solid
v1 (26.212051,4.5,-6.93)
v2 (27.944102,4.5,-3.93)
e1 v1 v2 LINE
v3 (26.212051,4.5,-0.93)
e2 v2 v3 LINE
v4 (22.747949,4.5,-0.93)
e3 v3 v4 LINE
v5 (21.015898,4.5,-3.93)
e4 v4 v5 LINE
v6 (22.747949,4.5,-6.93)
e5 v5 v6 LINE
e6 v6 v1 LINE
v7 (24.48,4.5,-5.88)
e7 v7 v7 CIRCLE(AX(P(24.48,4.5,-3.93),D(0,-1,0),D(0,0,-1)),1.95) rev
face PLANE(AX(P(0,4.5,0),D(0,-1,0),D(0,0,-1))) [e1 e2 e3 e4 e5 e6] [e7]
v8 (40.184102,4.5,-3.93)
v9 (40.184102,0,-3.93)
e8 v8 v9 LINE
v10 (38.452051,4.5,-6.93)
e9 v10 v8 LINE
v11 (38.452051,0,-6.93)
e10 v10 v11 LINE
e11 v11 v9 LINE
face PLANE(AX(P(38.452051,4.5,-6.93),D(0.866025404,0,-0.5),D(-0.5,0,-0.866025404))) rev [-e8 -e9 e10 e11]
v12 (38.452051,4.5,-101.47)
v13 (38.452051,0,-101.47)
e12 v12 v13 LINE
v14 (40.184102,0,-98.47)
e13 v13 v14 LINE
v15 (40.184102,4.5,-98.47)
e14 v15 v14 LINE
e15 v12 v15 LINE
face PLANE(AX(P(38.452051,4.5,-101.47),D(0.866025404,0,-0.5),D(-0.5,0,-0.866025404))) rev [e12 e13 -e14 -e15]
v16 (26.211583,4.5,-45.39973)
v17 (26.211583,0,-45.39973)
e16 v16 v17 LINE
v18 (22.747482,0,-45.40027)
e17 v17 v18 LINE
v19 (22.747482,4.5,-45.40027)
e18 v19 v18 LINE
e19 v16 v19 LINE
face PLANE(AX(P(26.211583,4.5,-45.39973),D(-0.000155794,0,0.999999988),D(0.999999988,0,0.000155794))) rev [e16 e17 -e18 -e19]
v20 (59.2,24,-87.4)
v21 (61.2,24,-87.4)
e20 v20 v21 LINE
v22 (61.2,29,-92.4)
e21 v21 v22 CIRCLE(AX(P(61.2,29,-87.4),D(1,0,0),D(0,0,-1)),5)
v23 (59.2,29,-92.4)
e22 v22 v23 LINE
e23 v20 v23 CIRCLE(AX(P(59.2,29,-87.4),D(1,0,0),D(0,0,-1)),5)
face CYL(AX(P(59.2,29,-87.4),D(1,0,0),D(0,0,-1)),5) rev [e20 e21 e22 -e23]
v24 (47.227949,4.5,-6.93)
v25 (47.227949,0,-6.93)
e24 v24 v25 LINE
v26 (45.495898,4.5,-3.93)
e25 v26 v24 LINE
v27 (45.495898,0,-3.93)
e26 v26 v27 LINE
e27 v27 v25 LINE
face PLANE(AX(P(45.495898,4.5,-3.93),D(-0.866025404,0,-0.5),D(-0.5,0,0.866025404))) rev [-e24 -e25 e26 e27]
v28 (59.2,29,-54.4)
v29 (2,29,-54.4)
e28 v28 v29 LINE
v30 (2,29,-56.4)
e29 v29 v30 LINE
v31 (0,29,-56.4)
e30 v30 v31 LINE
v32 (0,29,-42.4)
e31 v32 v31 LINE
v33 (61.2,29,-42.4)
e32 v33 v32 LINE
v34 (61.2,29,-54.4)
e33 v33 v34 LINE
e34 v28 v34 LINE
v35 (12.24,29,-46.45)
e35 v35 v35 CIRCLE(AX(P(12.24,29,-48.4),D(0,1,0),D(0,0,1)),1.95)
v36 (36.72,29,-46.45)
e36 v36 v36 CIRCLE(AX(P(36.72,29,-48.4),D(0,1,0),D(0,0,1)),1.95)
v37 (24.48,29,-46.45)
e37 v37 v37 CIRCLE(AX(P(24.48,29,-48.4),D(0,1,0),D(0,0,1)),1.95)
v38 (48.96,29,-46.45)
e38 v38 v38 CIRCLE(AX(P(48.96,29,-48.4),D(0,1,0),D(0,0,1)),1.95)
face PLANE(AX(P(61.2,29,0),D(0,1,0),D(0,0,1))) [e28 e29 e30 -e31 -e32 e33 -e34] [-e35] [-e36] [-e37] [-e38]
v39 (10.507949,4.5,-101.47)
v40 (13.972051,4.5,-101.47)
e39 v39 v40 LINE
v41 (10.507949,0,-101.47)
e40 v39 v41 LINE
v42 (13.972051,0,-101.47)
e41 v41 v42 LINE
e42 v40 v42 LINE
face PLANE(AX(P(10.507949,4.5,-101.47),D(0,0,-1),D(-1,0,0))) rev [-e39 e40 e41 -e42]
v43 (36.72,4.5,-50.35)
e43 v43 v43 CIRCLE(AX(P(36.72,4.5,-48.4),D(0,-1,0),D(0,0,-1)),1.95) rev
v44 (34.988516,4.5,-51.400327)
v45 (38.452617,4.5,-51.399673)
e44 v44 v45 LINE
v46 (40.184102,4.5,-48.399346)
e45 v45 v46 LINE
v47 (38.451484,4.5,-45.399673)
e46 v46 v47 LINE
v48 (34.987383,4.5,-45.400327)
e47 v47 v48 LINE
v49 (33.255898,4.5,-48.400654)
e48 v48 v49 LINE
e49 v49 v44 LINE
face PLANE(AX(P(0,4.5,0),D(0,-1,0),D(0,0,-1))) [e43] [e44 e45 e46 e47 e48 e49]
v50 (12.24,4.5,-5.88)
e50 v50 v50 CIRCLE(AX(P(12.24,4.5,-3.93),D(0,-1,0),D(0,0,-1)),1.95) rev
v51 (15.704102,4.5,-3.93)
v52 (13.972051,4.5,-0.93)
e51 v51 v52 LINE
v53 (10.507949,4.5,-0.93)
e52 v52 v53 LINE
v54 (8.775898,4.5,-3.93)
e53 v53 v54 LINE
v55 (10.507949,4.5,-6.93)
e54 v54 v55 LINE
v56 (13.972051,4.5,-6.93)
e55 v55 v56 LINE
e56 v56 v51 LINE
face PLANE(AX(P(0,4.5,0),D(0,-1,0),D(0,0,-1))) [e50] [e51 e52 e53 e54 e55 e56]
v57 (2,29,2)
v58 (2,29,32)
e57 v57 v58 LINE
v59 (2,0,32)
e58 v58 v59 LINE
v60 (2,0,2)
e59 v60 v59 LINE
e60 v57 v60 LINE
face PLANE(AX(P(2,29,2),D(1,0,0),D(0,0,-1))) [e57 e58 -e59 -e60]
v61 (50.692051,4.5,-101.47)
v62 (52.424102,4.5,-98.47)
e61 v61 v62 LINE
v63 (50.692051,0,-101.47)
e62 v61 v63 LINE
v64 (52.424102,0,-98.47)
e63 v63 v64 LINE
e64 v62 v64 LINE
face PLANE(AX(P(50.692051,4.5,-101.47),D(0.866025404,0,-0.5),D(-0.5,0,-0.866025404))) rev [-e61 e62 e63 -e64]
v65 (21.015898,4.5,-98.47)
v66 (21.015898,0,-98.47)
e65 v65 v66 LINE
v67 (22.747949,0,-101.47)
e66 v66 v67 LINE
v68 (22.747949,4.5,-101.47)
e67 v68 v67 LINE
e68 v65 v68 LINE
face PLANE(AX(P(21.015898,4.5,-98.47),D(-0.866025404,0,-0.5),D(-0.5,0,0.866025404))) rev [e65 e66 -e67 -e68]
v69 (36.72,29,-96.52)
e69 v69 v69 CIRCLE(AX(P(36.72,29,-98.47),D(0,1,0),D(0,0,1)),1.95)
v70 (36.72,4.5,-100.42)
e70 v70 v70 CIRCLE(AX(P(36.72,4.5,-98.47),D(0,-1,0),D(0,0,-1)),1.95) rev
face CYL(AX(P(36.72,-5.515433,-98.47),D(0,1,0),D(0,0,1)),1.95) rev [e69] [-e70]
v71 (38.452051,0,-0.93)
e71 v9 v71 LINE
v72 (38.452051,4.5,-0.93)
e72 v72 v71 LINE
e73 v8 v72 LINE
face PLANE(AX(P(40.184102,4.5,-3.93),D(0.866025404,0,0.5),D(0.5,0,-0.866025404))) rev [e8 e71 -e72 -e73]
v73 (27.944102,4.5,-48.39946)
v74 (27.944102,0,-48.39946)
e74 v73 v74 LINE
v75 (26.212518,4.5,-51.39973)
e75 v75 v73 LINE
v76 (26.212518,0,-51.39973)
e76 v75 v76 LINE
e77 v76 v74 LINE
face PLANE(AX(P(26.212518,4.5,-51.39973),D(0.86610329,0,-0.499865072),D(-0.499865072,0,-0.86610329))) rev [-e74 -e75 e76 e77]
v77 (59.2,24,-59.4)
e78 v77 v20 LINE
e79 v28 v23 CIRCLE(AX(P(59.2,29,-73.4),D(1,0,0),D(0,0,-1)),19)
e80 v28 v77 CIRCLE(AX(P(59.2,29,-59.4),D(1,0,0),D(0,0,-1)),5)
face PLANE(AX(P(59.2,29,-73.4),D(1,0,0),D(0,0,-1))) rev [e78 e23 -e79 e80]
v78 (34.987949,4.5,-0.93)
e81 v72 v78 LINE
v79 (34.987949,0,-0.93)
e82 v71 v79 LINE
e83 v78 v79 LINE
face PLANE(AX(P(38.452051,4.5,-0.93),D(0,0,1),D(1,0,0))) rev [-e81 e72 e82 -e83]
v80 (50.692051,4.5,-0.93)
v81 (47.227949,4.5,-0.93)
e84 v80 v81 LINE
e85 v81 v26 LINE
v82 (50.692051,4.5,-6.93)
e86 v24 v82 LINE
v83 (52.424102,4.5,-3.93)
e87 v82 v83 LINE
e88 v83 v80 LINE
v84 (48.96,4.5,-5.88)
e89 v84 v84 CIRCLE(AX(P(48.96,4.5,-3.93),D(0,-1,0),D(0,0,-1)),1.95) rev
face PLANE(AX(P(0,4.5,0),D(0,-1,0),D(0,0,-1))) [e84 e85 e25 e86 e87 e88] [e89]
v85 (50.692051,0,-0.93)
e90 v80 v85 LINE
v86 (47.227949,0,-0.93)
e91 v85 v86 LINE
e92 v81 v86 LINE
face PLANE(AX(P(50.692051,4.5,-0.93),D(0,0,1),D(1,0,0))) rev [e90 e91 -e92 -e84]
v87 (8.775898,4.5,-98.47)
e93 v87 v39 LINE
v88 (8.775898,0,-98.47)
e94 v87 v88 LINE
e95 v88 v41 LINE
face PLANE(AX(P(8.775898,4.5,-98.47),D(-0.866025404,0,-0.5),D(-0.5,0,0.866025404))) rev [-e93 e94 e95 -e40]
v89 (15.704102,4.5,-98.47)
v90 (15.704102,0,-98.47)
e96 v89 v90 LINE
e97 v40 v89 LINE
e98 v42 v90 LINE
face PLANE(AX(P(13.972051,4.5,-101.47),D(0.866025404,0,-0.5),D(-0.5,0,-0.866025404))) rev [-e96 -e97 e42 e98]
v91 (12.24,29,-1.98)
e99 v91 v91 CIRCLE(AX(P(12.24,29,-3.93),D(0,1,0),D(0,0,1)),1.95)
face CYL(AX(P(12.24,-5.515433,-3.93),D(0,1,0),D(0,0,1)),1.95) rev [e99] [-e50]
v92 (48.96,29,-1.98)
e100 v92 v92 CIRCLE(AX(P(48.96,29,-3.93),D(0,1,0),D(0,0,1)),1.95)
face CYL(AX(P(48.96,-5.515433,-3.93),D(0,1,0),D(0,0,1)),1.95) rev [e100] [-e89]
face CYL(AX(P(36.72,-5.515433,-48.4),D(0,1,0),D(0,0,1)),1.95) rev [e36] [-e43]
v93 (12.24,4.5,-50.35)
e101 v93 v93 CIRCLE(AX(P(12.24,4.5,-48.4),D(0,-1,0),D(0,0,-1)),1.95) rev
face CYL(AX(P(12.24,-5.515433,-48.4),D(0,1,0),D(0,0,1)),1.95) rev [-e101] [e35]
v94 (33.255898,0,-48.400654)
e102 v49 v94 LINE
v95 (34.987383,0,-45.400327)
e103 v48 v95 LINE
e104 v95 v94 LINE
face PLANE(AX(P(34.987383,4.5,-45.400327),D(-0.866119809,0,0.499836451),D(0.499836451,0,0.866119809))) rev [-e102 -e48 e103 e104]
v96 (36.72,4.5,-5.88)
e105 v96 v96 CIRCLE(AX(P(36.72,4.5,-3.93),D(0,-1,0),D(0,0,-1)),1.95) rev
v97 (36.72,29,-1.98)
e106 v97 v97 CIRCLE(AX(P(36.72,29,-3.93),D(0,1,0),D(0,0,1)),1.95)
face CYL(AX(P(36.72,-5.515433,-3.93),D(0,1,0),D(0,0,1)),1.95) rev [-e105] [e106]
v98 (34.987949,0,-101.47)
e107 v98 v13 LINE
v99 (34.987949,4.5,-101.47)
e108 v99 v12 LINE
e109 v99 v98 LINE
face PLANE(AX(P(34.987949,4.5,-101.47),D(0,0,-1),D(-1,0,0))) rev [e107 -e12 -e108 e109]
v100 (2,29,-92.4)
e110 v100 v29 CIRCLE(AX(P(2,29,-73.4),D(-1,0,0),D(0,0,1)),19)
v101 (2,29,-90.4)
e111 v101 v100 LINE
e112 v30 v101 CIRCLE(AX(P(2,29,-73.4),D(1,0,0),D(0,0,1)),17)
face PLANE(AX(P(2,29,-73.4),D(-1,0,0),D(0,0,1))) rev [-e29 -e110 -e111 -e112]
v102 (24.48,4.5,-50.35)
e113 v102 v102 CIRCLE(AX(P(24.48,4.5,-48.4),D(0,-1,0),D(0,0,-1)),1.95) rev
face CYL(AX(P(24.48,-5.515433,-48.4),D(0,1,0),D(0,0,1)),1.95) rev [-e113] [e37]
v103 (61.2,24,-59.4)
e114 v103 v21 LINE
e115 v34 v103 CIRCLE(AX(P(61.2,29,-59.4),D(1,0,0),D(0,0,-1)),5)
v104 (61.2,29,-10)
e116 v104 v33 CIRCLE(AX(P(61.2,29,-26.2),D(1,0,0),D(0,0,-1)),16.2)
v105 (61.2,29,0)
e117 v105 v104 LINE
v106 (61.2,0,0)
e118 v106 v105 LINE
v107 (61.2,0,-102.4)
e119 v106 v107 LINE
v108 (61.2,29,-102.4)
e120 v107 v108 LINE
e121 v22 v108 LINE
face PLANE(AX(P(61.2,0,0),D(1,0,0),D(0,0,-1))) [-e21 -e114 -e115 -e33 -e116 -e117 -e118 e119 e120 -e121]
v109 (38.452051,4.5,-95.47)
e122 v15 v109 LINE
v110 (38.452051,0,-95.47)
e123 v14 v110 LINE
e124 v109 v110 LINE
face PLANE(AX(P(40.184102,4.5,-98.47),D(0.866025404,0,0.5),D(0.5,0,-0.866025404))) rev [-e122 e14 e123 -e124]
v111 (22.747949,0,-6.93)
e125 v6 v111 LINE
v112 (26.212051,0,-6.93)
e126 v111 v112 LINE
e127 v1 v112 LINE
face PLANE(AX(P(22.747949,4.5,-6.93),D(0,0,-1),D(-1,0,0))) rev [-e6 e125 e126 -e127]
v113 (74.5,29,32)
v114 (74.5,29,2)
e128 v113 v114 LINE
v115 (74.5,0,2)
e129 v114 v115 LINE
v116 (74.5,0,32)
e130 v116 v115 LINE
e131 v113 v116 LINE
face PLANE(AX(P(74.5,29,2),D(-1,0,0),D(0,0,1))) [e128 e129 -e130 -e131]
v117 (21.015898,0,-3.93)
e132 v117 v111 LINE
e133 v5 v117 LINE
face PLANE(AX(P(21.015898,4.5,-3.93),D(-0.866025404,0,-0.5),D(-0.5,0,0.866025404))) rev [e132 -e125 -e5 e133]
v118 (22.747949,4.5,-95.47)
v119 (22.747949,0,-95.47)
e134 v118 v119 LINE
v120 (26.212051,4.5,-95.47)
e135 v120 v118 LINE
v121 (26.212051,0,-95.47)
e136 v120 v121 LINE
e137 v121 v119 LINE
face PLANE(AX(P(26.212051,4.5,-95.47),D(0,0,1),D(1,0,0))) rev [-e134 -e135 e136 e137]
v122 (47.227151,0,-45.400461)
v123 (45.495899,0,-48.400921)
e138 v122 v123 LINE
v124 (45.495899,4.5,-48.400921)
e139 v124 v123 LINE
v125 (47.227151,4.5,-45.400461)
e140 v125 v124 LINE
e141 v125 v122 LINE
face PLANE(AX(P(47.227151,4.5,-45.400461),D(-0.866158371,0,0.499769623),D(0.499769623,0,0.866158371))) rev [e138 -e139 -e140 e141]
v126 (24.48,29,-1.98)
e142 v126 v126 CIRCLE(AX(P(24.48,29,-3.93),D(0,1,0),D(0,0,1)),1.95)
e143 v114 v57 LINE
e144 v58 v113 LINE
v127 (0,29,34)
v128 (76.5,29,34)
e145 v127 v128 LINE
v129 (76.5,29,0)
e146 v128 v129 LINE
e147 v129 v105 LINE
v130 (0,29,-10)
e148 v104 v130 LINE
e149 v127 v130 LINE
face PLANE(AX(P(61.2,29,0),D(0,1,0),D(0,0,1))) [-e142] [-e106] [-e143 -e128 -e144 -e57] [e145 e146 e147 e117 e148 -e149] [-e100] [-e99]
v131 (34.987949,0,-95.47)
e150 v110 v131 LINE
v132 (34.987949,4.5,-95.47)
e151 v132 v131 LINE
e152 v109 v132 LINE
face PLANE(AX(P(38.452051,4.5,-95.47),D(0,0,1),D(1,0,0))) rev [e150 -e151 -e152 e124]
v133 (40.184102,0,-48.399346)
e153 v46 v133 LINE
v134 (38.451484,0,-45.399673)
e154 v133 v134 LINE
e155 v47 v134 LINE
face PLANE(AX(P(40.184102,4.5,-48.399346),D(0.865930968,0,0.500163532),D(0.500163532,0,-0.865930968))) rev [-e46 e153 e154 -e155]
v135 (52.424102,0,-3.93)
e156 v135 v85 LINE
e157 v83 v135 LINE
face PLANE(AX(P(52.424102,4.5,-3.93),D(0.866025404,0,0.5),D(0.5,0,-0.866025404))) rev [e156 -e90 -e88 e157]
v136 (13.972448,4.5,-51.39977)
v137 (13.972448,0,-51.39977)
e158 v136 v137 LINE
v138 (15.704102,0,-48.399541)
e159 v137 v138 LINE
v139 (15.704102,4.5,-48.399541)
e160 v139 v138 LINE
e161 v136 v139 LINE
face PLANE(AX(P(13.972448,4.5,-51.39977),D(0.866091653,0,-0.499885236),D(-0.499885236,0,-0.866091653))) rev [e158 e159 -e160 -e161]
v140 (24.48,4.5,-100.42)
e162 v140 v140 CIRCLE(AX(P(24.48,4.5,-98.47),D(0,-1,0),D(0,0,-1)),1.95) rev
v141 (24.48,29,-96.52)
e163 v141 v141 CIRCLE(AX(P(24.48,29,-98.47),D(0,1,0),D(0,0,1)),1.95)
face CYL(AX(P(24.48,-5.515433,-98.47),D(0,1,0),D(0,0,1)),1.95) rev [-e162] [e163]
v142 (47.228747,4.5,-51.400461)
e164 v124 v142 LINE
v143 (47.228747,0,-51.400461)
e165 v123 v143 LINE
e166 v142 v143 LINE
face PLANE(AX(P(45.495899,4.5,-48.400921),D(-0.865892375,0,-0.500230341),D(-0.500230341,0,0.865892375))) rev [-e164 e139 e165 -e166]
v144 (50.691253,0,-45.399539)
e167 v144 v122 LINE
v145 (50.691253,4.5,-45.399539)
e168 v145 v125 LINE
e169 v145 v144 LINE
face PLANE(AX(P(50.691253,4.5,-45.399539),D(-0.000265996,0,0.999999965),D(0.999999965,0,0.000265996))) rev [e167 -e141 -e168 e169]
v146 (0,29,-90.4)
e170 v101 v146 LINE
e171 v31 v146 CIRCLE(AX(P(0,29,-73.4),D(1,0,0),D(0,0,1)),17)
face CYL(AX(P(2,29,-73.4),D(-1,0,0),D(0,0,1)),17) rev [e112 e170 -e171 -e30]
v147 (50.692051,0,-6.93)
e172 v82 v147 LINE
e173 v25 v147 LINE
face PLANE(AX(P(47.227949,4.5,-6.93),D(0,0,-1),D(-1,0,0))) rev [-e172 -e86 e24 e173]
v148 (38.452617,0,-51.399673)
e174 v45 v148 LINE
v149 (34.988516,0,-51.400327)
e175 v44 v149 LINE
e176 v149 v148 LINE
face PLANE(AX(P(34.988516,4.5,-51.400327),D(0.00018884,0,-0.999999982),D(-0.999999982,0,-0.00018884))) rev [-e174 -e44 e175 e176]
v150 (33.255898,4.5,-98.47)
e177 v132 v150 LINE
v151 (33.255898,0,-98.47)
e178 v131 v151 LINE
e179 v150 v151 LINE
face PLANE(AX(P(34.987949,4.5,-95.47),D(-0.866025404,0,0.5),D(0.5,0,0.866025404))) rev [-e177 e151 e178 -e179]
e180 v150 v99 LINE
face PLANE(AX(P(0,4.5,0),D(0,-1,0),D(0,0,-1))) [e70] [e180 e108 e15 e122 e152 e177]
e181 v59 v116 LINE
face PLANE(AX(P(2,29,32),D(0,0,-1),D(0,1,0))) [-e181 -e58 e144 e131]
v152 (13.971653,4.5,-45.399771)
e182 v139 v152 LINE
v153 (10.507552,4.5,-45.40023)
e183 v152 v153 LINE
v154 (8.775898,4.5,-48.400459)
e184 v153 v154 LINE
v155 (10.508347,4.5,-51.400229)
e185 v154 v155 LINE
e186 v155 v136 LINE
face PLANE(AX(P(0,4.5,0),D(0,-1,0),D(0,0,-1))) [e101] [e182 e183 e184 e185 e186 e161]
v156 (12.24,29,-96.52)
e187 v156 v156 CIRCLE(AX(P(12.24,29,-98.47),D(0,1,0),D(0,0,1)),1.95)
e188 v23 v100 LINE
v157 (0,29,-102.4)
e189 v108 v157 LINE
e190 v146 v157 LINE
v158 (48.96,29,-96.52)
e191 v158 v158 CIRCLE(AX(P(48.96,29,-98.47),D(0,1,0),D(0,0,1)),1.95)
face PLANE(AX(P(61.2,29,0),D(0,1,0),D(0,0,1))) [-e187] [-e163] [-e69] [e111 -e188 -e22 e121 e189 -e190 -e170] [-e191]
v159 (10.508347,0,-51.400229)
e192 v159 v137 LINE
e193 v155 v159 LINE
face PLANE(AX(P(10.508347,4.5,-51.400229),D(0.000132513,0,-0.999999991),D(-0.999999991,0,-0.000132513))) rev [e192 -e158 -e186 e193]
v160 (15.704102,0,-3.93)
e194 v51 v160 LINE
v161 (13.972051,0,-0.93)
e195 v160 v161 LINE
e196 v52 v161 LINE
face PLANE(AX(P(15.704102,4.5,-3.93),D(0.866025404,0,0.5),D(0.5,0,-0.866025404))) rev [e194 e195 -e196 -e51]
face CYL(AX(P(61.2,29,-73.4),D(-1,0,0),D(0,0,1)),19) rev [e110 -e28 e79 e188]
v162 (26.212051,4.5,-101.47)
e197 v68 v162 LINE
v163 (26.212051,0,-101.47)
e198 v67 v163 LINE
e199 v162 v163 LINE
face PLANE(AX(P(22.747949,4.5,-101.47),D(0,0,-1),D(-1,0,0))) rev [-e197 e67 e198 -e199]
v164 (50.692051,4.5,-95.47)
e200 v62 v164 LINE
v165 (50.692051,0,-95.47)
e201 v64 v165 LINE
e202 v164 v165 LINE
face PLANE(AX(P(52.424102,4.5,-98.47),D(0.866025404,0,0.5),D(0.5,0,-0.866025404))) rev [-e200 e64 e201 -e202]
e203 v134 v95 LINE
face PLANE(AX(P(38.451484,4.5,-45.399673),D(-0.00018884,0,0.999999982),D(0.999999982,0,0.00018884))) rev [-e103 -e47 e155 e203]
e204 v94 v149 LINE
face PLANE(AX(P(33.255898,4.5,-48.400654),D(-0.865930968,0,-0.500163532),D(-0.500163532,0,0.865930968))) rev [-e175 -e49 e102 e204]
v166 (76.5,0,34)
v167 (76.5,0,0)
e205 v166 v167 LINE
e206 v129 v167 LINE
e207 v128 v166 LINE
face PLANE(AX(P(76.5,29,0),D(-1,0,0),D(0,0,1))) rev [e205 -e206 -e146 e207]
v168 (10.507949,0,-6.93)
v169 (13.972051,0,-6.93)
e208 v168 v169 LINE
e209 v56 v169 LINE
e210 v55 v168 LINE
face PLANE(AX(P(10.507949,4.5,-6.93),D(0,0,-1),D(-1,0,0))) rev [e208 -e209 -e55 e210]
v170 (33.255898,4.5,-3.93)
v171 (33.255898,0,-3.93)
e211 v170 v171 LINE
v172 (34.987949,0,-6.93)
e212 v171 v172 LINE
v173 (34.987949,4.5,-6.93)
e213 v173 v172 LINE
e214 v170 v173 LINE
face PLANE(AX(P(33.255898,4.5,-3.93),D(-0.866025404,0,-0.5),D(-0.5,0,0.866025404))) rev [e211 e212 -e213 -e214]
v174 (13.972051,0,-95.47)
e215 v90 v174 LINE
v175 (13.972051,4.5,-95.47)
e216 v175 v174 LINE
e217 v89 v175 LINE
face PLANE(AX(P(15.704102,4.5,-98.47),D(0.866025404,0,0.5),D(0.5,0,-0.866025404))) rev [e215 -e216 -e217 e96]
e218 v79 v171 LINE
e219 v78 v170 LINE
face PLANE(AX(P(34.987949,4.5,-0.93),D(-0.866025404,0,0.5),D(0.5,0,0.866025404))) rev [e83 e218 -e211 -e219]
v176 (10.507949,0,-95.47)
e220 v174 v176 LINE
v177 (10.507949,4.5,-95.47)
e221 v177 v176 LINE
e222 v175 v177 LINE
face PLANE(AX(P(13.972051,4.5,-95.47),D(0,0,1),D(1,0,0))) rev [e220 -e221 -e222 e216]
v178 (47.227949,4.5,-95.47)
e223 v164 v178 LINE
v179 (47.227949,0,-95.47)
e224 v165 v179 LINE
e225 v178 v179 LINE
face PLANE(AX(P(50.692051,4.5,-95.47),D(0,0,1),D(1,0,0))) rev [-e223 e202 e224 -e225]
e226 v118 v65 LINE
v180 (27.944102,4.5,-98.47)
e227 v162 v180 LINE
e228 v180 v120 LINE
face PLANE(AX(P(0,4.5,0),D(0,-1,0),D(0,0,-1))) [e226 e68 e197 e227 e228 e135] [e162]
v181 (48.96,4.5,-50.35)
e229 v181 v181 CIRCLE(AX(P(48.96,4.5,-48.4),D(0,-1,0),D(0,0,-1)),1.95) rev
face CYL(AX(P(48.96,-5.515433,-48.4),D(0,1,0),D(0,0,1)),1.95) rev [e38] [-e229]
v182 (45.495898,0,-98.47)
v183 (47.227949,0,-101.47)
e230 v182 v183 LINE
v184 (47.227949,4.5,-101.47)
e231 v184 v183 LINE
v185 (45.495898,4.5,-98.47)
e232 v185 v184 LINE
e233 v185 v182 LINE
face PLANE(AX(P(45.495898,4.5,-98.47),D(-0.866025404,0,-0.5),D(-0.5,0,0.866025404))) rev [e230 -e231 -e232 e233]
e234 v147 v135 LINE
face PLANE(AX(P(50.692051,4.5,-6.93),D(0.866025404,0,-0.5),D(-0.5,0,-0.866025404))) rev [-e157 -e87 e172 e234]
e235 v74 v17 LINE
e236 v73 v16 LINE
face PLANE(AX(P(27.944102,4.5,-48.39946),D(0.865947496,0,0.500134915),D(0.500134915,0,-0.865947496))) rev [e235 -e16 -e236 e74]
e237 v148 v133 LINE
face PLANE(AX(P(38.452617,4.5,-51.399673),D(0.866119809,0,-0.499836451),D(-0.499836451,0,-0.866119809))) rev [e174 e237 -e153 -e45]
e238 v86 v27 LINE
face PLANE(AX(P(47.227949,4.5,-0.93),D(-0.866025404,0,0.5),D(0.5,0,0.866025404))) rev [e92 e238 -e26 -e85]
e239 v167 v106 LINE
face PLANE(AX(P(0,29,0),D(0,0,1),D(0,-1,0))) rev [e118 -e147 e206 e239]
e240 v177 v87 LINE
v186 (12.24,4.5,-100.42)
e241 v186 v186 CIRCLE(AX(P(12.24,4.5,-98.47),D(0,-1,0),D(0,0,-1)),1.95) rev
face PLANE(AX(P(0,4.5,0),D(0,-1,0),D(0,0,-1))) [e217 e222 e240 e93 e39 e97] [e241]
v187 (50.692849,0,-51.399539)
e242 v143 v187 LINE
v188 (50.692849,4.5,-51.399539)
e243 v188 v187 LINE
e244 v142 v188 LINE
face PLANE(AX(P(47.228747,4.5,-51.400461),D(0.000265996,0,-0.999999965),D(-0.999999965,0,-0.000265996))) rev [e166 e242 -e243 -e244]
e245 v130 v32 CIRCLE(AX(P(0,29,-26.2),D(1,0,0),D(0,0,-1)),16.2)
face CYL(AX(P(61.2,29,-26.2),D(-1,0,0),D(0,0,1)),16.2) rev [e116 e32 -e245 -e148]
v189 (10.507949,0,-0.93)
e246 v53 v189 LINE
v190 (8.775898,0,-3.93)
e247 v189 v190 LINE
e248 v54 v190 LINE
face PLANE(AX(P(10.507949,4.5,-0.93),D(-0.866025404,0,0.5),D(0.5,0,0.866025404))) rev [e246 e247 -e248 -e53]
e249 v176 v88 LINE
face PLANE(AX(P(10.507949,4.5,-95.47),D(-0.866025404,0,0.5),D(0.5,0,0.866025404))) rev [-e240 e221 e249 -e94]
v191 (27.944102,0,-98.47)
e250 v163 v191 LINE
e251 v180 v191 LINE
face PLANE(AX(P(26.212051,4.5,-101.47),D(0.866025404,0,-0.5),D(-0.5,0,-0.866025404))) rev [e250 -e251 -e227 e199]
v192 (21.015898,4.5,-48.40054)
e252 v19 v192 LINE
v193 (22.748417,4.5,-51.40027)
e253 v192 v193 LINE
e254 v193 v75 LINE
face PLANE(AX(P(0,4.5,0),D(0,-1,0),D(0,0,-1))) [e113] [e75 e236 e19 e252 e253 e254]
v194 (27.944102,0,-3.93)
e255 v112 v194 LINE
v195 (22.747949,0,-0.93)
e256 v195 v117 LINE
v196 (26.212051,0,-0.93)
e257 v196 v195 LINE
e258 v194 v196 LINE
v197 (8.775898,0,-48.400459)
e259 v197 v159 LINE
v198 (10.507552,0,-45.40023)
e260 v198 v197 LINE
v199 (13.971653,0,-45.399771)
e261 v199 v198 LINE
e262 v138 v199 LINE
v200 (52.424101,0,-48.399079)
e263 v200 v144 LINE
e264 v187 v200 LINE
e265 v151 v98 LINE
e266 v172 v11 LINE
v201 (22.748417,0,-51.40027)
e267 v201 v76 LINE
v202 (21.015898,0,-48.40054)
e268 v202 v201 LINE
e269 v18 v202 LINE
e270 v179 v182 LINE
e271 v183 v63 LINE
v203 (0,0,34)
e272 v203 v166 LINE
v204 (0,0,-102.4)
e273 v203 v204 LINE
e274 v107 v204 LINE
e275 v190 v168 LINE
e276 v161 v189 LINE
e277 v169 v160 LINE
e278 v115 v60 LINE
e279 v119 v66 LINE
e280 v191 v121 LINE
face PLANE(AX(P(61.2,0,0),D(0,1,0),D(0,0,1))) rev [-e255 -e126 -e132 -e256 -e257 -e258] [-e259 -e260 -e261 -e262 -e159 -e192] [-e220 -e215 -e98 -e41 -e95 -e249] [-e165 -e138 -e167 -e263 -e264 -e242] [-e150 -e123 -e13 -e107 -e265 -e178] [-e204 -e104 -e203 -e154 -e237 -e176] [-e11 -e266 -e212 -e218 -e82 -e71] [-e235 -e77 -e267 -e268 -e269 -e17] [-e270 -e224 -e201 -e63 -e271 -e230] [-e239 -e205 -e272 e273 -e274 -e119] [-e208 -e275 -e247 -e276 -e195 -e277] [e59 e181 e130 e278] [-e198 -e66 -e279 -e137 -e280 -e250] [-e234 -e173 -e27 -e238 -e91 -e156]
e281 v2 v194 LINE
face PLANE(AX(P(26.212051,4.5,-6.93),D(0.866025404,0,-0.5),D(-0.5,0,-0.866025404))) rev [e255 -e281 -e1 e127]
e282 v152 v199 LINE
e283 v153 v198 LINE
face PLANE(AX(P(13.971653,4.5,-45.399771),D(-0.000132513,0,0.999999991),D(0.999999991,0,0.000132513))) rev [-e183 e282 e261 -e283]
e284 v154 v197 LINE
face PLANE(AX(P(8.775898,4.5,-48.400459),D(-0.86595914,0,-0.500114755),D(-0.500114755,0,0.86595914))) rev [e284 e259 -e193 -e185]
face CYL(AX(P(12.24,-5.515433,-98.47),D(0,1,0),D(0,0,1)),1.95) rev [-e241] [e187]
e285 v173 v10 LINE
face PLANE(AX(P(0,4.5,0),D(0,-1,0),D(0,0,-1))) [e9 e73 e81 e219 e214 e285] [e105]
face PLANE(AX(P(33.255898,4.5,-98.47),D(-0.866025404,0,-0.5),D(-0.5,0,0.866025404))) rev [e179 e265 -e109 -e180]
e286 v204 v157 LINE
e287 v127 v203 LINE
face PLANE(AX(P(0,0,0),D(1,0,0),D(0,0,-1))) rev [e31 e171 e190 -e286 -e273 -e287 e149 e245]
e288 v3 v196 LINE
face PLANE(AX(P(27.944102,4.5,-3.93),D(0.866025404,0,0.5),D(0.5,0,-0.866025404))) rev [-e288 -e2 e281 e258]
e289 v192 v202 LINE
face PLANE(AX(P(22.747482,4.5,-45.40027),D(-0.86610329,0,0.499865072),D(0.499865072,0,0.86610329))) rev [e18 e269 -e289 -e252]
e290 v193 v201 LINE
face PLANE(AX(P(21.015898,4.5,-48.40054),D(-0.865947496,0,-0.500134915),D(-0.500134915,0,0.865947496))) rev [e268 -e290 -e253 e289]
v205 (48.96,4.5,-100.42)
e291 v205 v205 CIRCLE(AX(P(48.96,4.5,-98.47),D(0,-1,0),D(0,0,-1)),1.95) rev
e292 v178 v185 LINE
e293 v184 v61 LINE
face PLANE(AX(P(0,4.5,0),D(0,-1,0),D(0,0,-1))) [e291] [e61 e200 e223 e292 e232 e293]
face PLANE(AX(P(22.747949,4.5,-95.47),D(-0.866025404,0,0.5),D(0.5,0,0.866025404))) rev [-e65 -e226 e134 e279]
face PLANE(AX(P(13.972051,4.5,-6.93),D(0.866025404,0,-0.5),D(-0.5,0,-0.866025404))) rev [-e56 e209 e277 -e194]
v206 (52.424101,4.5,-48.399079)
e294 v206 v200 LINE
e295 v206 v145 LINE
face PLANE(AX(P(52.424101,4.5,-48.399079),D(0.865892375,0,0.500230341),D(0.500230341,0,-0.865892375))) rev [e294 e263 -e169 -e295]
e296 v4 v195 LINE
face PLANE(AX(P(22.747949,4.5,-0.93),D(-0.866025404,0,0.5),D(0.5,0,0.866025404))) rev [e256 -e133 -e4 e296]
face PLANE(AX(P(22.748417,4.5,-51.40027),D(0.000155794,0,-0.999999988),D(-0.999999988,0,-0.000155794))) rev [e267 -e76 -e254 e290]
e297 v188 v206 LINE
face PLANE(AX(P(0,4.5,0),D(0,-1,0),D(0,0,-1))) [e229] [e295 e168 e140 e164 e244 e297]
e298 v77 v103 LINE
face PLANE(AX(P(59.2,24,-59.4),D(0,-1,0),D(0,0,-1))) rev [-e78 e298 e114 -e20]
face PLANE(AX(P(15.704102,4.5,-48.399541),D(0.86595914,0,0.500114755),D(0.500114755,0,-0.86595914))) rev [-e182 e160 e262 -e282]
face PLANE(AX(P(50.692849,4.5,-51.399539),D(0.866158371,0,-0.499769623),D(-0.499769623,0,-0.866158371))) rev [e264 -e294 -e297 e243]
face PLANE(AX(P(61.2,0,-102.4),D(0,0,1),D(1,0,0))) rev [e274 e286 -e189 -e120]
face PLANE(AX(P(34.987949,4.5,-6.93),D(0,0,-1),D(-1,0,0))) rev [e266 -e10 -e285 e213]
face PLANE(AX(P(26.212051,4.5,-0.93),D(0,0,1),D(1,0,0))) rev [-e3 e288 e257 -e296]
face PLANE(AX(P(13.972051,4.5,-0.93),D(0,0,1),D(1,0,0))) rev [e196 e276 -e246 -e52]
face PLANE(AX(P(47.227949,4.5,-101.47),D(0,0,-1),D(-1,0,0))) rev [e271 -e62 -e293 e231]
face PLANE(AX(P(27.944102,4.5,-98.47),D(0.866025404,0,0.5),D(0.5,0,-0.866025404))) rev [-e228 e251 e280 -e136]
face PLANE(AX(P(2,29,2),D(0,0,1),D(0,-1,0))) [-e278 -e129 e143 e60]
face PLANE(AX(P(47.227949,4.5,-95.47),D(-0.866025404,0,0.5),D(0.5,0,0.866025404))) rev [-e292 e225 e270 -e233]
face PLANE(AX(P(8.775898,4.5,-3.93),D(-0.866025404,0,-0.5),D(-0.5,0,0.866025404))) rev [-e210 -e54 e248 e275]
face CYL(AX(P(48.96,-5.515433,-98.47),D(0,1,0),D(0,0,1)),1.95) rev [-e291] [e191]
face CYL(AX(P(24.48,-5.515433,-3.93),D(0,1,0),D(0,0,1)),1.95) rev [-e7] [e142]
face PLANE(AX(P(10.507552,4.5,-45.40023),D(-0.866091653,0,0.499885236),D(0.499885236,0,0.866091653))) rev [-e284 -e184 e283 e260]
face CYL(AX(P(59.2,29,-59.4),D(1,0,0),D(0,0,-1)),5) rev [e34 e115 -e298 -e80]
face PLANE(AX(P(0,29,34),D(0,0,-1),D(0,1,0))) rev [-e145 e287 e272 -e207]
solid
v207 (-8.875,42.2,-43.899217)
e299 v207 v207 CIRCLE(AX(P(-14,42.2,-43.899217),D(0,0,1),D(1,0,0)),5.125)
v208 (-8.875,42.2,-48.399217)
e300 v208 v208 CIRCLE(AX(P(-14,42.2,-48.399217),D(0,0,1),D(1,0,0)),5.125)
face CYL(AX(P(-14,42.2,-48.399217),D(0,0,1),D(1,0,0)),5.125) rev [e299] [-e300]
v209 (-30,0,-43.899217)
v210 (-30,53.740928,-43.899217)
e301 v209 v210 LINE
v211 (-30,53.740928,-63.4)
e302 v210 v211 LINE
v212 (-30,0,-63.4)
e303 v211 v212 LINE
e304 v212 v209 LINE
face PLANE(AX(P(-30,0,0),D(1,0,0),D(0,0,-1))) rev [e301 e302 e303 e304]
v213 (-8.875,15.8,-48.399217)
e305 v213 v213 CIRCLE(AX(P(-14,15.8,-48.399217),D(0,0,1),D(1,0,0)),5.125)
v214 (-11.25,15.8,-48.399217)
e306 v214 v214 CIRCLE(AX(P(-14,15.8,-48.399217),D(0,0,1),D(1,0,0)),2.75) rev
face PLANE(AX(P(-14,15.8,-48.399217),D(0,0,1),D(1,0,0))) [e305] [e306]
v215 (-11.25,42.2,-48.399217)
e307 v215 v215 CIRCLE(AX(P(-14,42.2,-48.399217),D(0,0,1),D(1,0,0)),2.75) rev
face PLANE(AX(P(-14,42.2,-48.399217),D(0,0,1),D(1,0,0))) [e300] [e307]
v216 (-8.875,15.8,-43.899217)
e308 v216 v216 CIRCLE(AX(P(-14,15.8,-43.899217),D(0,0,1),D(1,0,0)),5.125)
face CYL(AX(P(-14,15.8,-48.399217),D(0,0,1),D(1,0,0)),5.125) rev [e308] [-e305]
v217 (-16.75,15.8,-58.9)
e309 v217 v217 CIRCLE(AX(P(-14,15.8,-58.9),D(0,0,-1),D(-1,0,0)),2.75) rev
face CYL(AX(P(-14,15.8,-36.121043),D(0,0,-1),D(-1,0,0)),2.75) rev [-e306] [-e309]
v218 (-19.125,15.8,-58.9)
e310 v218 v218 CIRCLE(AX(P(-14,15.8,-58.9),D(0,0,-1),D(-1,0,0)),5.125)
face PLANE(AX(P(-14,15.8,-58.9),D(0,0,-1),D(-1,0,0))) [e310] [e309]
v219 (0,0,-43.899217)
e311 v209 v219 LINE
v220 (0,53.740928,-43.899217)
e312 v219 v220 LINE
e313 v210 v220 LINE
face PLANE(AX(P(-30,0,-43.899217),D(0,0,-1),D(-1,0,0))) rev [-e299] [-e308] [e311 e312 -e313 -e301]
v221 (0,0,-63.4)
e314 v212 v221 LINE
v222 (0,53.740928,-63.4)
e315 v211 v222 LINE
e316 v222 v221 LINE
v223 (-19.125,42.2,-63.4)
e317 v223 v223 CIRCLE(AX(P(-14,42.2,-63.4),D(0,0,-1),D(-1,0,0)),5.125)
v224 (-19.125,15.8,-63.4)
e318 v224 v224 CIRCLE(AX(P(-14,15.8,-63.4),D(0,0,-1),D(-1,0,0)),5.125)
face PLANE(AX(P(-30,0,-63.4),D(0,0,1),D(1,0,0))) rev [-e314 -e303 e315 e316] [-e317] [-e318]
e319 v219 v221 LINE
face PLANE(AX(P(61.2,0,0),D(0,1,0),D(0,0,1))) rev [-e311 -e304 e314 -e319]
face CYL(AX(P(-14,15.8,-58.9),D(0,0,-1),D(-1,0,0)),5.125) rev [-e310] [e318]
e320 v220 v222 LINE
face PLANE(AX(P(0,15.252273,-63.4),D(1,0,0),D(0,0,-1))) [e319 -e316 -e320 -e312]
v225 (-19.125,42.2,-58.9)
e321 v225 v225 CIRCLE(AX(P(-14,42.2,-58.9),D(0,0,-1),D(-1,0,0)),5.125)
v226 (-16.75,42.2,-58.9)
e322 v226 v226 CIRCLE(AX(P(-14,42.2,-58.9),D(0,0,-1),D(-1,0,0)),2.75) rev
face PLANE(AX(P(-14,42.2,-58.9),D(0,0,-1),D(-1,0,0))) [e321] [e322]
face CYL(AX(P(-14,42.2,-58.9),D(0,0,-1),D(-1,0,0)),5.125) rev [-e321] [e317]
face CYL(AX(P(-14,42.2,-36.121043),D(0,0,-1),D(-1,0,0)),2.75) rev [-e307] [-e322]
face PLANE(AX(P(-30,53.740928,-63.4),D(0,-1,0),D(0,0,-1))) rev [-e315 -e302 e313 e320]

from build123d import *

# Parameters (mm, degrees)
BOSS_EXTRUDE1_DEPTH = 61.2
SKETCH7_W           = 19.50078266
SKETCH7_H           = 53.740928499
BOSS_EXTRUDE2_DEPTH = 30
BOSS_EXTRUDE3_START = -2
BOSS_EXTRUDE3_DEPTH = 2
BOSS_EXTRUDE4_DEPTH = 2
SKETCH26_W          = 76.5
SKETCH26_H          = 34
SKETCH26_W_2        = 72.5
SKETCH26_H_2        = 30
BOSS_EXTRUDE5_DEPTH = 29
SKETCH8_R           = 2.75
CUT_EXTRUDE1_DEPTH  = 19.50078266
SKETCH9_R           = 5.125
CUT_EXTRUDE2_DEPTH  = 4.5
CUT_EXTRUDE8_START  = -4.5
SKETCH10_R          = 5.125
CUT_EXTRUDE8_DEPTH  = 4.5
SKETCH22_R          = 1.95
CUT_EXTRUDE9_DEPTH  = 29
CUT_EXTRUDE10_DEPTH = 4.5
CUT_EXTRUE11_DEPTH  = 2


# Read off the part's stored shape, not the designer's step: Split1
with BuildPart() as part:
    # Sketch1 → Boss-Extrude1 (new body)
    with BuildSketch(Plane(origin=(0, 0, 0), x_dir=(0, 0, -1), z_dir=(1, 0, 0))):
        with BuildLine():
            Line((0, 0), (102.4, 0))
            Line((102.4, 0), (102.4, 29))
            Line((102.4, 29), (92.4, 29))
            ThreePointArc((92.4, 29), (73.4, 10), (54.4, 29))
            Line((54.4, 29), (42.4, 29))
            ThreePointArc((42.4, 29), (26.2, 12.8), (10, 29))
            Line((10, 29), (0, 29))
            Line((0, 29), (0, 0))
        make_face()
    extrude(amount=BOSS_EXTRUDE1_DEPTH)

    # Sketch7 → Boss-Extrude2 (add)
    with BuildSketch(Plane.ZY):
        with Locations((-53.64960867, 26.87046425)):
            Rectangle(SKETCH7_W, SKETCH7_H)
    extrude(amount=BOSS_EXTRUDE2_DEPTH)

    # Sketch14 → Boss-Extrude3 (add)
    with BuildSketch(Plane(origin=(61.2, 0, 0), x_dir=(0, 0, -1), z_dir=(1, 0, 0)).offset(BOSS_EXTRUDE3_START)):
        with BuildLine():
            Line((54.4, 29), (92.4, 29))
            ThreePointArc((92.4, 29), (73.4, 10), (54.4, 29))
        make_face()
    extrude(amount=BOSS_EXTRUDE3_DEPTH)

    # Sketch19 → Boss-Extrude4 (add)
    with BuildSketch(Plane.ZY):
        with BuildLine():
            Line((-90.4, 29), (-92.4, 29))
            ThreePointArc((-92.4, 29), (-82.646621004, 12.401807327), (-63.4, 12.844505579))
            ThreePointArc((-63.4, 12.844505579), (-56.801807327, 19.753378996), (-54.4, 29))
            Line((-54.4, 29), (-56.4, 29))
            ThreePointArc((-56.4, 29), (-58.548985503, 20.726707522), (-64.452631579, 14.545083939))
            ThreePointArc((-64.452631579, 14.545083939), (-81.673292478, 14.148985503), (-90.4, 29))
        make_face()
    extrude(amount=-BOSS_EXTRUDE4_DEPTH)

    # Sketch26 → Boss-Extrude5 (add)
    with BuildSketch(Plane(origin=(0, 0, 0), x_dir=(1, 0, 0), z_dir=(0, 1, 0))):
        with Locations((38.25, -17)):
            Rectangle(SKETCH26_W, SKETCH26_H)
        with Locations((38.25, -17)):
            Rectangle(SKETCH26_W_2, SKETCH26_H_2, mode=Mode.SUBTRACT)
    extrude(amount=BOSS_EXTRUDE5_DEPTH)

    # Sketch8 → Cut-Extrude1 (cut)
    with BuildSketch(Plane(origin=(0, 0, -63.4), x_dir=(-1, 0, 0), z_dir=(0, 0, -1))):
        with Locations((14, 42.2)):
            Circle(SKETCH8_R)
        with Locations((14, 15.8)):
            Circle(SKETCH8_R)
    extrude(amount=-CUT_EXTRUDE1_DEPTH, mode=Mode.SUBTRACT)

    # Sketch9 → Cut-Extrude2 (cut)
    with BuildSketch(Plane(origin=(0, 0, -63.4), x_dir=(-1, 0, 0), z_dir=(0, 0, -1))):
        with Locations((14, 42.2)):
            Circle(SKETCH9_R)
        with Locations((14, 15.8)):
            Circle(SKETCH9_R)
    extrude(amount=-CUT_EXTRUDE2_DEPTH, mode=Mode.SUBTRACT)

    # Sketch10 → Cut-Extrude8 (cut)
    with BuildSketch(Plane.XY.offset(-43.89921734).offset(CUT_EXTRUDE8_START)):
        with Locations(Location((-14, 42.2, 0), (0, 0, 180))):
            Circle(SKETCH10_R)
        with Locations(Location((-14, 15.8, 0), (0, 0, 180))):
            Circle(SKETCH10_R)
    extrude(amount=CUT_EXTRUDE8_DEPTH, mode=Mode.SUBTRACT)

    # Sketch22 → Cut-Extrude9 (cut)
    with BuildSketch(Plane(origin=(0, 29, 0), x_dir=(1, 0, 0), z_dir=(0, 1, 0))):
        with Locations(Location((12.24, 48.4, 0), (0, 0, 270))):
            Circle(SKETCH22_R)
        with Locations(Location((24.48, 48.4, 0), (0, 0, 270))):
            Circle(SKETCH22_R)
        with Locations(Location((36.72, 48.4, 0), (0, 0, 270))):
            Circle(SKETCH22_R)
        with Locations(Location((48.96, 48.4, 0), (0, 0, 270))):
            Circle(SKETCH22_R)
        with Locations(Location((48.96, 98.47, 0), (0, 0, 270))):
            Circle(SKETCH22_R)
        with Locations(Location((24.48, 98.47, 0), (0, 0, 270))):
            Circle(SKETCH22_R)
        with Locations(Location((12.24, 98.47, 0), (0, 0, 270))):
            Circle(SKETCH22_R)
        with Locations(Location((36.72, 3.93, 0), (0, 0, 270))):
            Circle(SKETCH22_R)
        with Locations(Location((48.96, 3.93, 0), (0, 0, 270))):
            Circle(SKETCH22_R)
        with Locations(Location((12.24, 3.93, 0), (0, 0, 270))):
            Circle(SKETCH22_R)
        with Locations(Location((36.72, 98.47, 0), (0, 0, 270))):
            Circle(SKETCH22_R)
        with Locations(Location((24.48, 3.93, 0), (0, 0, 270))):
            Circle(SKETCH22_R)
    extrude(amount=-CUT_EXTRUDE9_DEPTH, mode=Mode.SUBTRACT)

    # Sketch24 → Cut-Extrude10 (cut)
    with BuildSketch(Plane.XZ):
        Polygon((15.704101615, -3.93), (13.972050808, -0.93), (10.507949192, -0.93), (8.775898385, -3.93), (10.507949192, -6.93), (13.972050808, -6.93), align=None)
        Polygon((27.944101615, -3.93), (26.212050808, -0.93), (22.747949192, -0.93), (21.015898385, -3.93), (22.747949192, -6.93), (26.212050808, -6.93), align=None)
        Polygon((40.184101615, -3.93), (38.452050808, -0.93), (34.987949192, -0.93), (33.255898385, -3.93), (34.987949192, -6.93), (38.452050808, -6.93), align=None)
        Polygon((52.424101615, -3.93), (50.692050808, -0.93), (47.227949192, -0.93), (45.495898385, -3.93), (47.227949192, -6.93), (50.692050808, -6.93), align=None)
        Polygon((45.495898507, -48.400921437), (47.228747241, -51.400460612), (50.692848734, -51.399539176), (52.424101493, -48.399078563), (50.691252759, -45.399539388), (47.227151266, -45.400460824), align=None)
        Polygon((33.255898447, -48.400654162), (34.988515744, -51.400327028), (38.452617298, -51.399672865), (40.184101553, -48.399345838), (38.451484256, -45.399672972), (34.987382702, -45.400327135), align=None)
        Polygon((21.015898427, -48.400539686), (22.748416595, -51.400269807), (26.212518168, -51.399730121), (27.944101573, -48.399460314), (26.211583405, -45.399730193), (22.747481832, -45.400269879), align=None)
        Polygon((8.775898415, -48.400459038), (10.508346746, -51.400229493), (13.972448331, -51.399770455), (15.704101585, -48.399540962), (13.971653254, -45.399770507), (10.507551669, -45.400229545), align=None)
        Polygon((10.507949192, -95.47), (8.775898385, -98.47), (10.507949192, -101.47), (13.972050808, -101.47), (15.704101615, -98.47), (13.972050808, -95.47), align=None)
        Polygon((22.747949192, -95.47), (21.015898385, -98.47), (22.747949192, -101.47), (26.212050808, -101.47), (27.944101615, -98.47), (26.212050808, -95.47), align=None)
        Polygon((34.987949192, -95.47), (33.255898385, -98.47), (34.987949192, -101.47), (38.452050808, -101.47), (40.184101615, -98.47), (38.452050808, -95.47), align=None)
        Polygon((47.227949192, -95.47), (45.495898385, -98.47), (47.227949192, -101.47), (50.692050808, -101.47), (52.424101615, -98.47), (50.692050808, -95.47), align=None)
    extrude(amount=-CUT_EXTRUDE10_DEPTH, mode=Mode.SUBTRACT)

    # Sketch25 → Cut-Extrue11 (cut)
    with BuildSketch(Plane(origin=(61.2, 0, 0), x_dir=(0, 0, -1), z_dir=(1, 0, 0))):
        with BuildLine():
            Line((59.4, 34), (87.4, 34))
            ThreePointArc((87.4, 34), (92.4, 29), (87.4, 24))
            Line((87.4, 24), (59.4, 24))
            ThreePointArc((59.4, 24), (54.4, 29), (59.4, 34))
        make_face()
    extrude(amount=-CUT_EXTRUE11_DEPTH, mode=Mode.SUBTRACT)


with BuildPart() as body_2:
    # Split1: the piece on the far side of the plane
    add(part.part)
    split(bisect_by=Plane.YZ, keep=Keep.BOTTOM)


with BuildPart() as part_1:
    add(part.part)

    # Split1
    split(bisect_by=Plane.YZ, keep=Keep.TOP)


solid = Compound([body_2.part, part_1.part])
